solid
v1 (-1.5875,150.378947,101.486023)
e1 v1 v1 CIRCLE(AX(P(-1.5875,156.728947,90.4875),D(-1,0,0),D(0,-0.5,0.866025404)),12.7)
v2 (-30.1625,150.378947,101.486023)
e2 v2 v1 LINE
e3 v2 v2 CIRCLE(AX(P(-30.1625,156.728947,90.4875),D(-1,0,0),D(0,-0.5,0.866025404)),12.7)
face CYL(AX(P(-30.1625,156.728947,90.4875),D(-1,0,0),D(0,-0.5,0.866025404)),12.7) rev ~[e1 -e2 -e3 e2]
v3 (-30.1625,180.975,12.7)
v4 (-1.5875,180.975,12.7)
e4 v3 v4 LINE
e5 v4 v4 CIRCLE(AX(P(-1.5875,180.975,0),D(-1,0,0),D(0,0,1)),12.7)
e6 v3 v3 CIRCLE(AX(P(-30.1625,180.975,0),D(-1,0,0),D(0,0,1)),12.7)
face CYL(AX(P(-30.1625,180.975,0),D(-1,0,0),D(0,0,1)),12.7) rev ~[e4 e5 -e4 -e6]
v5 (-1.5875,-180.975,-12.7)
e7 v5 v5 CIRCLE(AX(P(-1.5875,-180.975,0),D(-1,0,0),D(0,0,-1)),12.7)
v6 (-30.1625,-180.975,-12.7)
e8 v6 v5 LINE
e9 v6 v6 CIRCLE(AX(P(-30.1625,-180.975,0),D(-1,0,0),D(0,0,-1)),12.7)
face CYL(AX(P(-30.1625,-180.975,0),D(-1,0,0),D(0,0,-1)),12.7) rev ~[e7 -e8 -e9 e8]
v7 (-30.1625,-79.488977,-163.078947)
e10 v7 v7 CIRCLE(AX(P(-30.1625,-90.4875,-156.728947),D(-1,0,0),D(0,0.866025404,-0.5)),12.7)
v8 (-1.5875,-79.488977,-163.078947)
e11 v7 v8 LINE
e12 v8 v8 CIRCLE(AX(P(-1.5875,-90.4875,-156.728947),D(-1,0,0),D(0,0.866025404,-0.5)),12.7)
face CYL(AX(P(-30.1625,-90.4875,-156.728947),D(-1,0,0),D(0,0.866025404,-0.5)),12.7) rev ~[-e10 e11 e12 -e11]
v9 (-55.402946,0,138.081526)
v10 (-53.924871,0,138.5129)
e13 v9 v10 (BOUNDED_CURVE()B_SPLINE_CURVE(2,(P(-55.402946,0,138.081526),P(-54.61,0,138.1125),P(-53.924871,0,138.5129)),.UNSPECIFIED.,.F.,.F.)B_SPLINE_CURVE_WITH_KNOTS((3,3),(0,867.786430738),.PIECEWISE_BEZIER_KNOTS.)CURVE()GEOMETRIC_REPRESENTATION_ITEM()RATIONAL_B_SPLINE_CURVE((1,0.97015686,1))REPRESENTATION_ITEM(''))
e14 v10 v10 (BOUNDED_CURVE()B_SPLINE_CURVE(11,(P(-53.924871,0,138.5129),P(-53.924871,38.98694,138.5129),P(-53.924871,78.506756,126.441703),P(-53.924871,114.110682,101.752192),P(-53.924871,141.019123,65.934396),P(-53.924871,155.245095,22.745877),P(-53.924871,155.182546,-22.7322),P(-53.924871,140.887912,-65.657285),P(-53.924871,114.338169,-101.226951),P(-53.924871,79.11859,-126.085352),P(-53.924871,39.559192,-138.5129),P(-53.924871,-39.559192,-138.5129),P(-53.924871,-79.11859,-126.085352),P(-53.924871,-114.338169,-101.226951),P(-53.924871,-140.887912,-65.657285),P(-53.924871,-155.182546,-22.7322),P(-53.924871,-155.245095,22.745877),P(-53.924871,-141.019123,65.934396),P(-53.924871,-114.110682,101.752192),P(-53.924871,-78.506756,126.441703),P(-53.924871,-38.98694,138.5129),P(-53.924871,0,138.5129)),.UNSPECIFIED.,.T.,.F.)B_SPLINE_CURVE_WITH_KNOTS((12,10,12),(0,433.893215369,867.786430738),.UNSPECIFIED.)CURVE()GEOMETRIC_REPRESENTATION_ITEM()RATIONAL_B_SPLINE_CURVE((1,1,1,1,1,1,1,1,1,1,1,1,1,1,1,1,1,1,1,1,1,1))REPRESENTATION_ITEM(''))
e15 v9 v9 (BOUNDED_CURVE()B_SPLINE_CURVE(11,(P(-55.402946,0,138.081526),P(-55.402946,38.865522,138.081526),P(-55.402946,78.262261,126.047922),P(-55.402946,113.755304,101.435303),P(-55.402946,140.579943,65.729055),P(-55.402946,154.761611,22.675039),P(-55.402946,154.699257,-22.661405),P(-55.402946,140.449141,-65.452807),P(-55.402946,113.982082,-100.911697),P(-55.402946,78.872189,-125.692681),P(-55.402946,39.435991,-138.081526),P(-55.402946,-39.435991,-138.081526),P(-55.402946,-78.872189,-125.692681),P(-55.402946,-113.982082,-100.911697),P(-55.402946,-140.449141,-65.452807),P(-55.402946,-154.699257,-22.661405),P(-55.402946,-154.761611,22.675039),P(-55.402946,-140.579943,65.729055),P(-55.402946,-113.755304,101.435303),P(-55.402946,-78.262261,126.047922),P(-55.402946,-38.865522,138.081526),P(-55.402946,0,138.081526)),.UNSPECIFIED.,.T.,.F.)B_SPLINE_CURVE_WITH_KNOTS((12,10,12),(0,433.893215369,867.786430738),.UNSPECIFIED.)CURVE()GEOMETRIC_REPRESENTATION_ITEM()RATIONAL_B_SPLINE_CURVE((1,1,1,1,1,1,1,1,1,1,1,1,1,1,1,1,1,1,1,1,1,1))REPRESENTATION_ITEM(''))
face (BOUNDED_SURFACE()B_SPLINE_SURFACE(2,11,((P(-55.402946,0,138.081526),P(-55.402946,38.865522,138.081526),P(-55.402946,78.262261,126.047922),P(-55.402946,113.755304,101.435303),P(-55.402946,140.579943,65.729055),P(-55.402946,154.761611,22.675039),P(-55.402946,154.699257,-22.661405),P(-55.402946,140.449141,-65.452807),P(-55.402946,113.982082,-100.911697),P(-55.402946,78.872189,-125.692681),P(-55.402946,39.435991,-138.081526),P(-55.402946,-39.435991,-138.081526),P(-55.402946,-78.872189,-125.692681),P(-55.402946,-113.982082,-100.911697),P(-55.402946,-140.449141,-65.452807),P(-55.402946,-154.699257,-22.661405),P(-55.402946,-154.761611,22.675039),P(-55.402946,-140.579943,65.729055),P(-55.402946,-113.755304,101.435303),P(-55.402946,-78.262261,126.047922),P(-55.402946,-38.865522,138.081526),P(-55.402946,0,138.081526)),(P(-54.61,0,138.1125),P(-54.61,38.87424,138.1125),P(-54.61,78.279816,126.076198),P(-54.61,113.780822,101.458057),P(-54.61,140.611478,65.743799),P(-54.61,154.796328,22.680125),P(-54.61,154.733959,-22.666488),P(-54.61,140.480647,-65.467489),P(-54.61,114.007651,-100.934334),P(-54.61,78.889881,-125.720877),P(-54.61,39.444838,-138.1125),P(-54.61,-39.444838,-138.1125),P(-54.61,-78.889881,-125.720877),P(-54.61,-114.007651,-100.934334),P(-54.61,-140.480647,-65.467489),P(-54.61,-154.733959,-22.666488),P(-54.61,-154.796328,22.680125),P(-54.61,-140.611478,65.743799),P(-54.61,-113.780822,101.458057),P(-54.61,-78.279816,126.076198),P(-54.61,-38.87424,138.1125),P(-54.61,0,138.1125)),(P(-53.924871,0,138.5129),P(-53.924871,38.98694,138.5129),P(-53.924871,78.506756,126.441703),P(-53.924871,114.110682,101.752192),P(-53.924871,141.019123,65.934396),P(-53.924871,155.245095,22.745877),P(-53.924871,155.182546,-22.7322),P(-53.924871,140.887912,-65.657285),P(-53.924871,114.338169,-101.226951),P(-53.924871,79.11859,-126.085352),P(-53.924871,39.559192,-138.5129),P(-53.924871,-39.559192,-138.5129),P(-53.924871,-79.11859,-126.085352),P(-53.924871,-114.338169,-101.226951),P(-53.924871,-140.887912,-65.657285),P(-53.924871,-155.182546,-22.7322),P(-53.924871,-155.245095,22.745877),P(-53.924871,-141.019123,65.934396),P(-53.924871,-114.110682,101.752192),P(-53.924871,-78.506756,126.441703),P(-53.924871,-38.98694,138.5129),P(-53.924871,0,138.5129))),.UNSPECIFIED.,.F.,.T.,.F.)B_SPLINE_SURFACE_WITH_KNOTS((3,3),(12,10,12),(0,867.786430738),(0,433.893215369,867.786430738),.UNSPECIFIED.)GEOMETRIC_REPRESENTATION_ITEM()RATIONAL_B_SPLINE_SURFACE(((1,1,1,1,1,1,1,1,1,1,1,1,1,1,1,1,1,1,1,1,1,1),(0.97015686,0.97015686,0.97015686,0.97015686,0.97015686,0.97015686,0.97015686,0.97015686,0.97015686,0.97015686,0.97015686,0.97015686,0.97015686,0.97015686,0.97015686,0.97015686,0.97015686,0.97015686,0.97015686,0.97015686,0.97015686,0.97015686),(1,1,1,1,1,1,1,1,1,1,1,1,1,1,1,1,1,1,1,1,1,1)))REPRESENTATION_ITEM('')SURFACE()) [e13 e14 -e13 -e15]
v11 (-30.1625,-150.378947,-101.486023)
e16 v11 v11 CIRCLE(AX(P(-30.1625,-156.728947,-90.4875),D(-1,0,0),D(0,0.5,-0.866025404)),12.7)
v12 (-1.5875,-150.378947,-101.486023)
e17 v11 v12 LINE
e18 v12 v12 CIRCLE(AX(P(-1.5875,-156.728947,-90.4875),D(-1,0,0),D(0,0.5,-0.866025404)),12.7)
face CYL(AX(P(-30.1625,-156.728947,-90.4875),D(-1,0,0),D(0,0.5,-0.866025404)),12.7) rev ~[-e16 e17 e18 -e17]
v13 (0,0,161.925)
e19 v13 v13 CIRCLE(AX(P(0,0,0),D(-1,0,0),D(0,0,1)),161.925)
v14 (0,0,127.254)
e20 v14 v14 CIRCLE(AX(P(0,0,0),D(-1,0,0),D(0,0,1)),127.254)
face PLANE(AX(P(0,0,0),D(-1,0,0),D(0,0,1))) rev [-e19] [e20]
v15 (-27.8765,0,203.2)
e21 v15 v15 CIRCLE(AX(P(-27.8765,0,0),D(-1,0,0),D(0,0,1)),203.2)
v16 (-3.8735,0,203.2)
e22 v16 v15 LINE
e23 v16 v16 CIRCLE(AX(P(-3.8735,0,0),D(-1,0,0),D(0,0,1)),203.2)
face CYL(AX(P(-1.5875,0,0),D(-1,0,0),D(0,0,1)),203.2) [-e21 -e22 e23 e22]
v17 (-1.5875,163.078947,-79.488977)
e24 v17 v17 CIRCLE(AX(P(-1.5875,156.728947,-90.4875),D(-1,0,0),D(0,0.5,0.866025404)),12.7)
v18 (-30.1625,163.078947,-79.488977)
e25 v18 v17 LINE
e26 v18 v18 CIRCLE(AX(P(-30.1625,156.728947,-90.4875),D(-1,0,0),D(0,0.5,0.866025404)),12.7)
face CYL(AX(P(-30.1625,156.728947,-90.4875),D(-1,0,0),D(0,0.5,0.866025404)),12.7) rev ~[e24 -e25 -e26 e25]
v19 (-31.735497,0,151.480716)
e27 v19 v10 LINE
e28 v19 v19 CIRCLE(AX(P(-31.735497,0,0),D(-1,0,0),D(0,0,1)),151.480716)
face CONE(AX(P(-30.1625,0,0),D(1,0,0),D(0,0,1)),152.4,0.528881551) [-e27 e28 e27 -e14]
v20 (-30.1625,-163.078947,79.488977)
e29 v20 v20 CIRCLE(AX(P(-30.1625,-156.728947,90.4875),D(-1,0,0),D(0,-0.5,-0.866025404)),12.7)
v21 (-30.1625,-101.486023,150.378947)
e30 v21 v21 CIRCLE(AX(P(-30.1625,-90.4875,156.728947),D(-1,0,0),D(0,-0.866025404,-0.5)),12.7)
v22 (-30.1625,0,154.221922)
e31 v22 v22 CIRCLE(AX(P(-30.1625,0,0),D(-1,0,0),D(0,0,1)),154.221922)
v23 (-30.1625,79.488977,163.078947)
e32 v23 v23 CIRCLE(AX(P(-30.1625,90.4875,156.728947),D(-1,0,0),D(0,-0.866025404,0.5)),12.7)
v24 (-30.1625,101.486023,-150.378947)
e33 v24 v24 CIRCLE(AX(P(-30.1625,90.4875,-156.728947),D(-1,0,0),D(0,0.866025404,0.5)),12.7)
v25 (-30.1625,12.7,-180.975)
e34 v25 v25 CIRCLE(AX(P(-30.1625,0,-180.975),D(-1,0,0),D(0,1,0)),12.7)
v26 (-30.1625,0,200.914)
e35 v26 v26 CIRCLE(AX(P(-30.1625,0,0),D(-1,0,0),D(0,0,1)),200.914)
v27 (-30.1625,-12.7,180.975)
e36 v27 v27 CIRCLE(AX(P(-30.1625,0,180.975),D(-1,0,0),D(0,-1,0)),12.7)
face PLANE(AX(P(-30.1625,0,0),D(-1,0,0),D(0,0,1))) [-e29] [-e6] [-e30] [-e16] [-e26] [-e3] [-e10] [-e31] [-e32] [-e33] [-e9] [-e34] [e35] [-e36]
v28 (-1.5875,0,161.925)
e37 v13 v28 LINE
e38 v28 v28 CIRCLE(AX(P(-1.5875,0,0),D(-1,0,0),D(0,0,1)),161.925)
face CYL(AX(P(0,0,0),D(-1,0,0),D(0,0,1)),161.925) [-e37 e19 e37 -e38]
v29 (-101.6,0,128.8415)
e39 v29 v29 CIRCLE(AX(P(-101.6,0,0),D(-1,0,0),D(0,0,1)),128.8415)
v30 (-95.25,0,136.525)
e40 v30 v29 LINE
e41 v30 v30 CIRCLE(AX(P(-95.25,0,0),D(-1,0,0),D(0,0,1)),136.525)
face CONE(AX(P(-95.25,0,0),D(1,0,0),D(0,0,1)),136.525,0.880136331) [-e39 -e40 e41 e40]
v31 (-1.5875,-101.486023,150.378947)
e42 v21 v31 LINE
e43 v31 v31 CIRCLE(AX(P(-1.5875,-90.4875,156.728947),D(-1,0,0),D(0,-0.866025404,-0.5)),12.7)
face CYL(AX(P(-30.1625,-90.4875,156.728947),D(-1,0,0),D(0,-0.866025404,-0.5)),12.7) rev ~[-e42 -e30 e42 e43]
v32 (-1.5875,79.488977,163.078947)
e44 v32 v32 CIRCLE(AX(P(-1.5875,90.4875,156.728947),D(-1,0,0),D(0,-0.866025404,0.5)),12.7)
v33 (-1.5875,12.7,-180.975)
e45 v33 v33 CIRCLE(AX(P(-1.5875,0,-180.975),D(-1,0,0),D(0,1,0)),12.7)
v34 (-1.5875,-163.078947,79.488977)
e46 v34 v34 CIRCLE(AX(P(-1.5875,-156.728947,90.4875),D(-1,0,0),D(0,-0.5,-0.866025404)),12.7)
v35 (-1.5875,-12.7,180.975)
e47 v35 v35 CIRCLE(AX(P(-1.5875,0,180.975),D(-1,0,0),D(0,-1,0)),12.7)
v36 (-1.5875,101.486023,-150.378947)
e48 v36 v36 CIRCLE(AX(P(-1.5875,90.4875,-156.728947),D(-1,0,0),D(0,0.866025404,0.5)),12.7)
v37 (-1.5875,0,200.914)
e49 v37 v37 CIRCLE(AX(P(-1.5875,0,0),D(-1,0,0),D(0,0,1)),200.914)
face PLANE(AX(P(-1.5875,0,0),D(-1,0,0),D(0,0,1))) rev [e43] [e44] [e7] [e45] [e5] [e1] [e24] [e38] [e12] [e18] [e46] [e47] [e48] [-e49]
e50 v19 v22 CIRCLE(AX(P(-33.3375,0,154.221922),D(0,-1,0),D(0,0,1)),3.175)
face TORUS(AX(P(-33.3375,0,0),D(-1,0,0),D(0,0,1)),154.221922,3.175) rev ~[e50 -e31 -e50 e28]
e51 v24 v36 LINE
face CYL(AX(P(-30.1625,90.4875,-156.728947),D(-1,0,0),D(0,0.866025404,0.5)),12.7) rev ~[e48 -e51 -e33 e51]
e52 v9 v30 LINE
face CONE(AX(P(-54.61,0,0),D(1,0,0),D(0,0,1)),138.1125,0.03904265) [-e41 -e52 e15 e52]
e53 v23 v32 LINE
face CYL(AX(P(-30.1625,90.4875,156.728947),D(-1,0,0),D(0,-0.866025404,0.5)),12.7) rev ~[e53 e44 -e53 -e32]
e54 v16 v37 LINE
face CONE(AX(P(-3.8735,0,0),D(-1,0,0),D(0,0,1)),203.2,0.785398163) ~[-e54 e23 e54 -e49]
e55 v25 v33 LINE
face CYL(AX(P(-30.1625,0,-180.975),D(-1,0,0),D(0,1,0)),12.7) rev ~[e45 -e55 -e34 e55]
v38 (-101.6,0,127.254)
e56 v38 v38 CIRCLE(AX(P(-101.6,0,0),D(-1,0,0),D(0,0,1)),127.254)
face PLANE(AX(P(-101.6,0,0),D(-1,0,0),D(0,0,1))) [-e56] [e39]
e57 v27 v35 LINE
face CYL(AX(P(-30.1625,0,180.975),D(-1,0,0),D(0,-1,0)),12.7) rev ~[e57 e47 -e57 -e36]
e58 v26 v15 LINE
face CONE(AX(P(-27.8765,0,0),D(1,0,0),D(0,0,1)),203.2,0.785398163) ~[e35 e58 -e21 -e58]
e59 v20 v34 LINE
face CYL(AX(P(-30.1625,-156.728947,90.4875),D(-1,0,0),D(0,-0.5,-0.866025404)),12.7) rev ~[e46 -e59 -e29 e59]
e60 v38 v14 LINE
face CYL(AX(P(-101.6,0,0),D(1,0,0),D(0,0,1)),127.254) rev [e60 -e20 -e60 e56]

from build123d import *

# Parameters (mm, degrees)
F2_R            = 12.7
F3_DEPTH        = 30.1635
F3_COPIES_COUNT = 12
F4_R            = 3.175
F5_SIZE2        = 2.286
F5_SIZE         = 2.286


# Not quite as in the source:
# - a pattern or mirror of a feature is missing from the dataset's text; its kind, count and spacing are read off the source's solid


with BuildPart() as f1:
    # F0 (on Front) → F1 (revolve)
    with BuildSketch(Plane.XZ):
        Polygon((-101.6, 127.254), (0, 127.254), (0, 161.925), (-1.5875, 161.925), (-1.5875, 203.2), (-30.1625, 203.2), (-30.1625, 152.4), (-54.61, 138.1125), (-95.25, 136.525), (-101.6, 128.8415), align=None)
    revolve(axis=Axis((-71.3775697505, 0, 0), (-1, 0, 0)))

    # F2 (on face) → F3 (cut, through all)
    with BuildSketch(Plane(origin=(-30.1625, 0, 0), x_dir=(0, -1, 0), z_dir=(-1, 0, 0))):
        with Locations((0, 180.975)):
            Circle(F2_R)
    f3 = extrude(amount=-F3_DEPTH, mode=Mode.SUBTRACT)

    # F3_copies: F3 ×12 about axis
    f3_copies_axis = Axis((0, 0, 0), (1, 0, 0))
    for i in range(1, F3_COPIES_COUNT):
        add(f3.rotate(f3_copies_axis, i * 360 / F3_COPIES_COUNT), mode=Mode.SUBTRACT)

    # F4
    f4_edges = [f1.edges().sort_by_distance(p)[0] for p in [
        (-30.1625, 0, -152.4),
        (-54.61, 0, -138.1125),
    ]]
    fillet(f4_edges, radius=F4_R)

    # F5
    f5_edges = [f1.edges().sort_by_distance(p)[0] for p in [
        (-1.5875, 0, -203.2),
        (-30.1625, 0, -203.2),
        (-15.875, 0, 203.2),
    ]]
    chamfer(f5_edges, length=F5_SIZE, length2=F5_SIZE2)


solid = f1.part
